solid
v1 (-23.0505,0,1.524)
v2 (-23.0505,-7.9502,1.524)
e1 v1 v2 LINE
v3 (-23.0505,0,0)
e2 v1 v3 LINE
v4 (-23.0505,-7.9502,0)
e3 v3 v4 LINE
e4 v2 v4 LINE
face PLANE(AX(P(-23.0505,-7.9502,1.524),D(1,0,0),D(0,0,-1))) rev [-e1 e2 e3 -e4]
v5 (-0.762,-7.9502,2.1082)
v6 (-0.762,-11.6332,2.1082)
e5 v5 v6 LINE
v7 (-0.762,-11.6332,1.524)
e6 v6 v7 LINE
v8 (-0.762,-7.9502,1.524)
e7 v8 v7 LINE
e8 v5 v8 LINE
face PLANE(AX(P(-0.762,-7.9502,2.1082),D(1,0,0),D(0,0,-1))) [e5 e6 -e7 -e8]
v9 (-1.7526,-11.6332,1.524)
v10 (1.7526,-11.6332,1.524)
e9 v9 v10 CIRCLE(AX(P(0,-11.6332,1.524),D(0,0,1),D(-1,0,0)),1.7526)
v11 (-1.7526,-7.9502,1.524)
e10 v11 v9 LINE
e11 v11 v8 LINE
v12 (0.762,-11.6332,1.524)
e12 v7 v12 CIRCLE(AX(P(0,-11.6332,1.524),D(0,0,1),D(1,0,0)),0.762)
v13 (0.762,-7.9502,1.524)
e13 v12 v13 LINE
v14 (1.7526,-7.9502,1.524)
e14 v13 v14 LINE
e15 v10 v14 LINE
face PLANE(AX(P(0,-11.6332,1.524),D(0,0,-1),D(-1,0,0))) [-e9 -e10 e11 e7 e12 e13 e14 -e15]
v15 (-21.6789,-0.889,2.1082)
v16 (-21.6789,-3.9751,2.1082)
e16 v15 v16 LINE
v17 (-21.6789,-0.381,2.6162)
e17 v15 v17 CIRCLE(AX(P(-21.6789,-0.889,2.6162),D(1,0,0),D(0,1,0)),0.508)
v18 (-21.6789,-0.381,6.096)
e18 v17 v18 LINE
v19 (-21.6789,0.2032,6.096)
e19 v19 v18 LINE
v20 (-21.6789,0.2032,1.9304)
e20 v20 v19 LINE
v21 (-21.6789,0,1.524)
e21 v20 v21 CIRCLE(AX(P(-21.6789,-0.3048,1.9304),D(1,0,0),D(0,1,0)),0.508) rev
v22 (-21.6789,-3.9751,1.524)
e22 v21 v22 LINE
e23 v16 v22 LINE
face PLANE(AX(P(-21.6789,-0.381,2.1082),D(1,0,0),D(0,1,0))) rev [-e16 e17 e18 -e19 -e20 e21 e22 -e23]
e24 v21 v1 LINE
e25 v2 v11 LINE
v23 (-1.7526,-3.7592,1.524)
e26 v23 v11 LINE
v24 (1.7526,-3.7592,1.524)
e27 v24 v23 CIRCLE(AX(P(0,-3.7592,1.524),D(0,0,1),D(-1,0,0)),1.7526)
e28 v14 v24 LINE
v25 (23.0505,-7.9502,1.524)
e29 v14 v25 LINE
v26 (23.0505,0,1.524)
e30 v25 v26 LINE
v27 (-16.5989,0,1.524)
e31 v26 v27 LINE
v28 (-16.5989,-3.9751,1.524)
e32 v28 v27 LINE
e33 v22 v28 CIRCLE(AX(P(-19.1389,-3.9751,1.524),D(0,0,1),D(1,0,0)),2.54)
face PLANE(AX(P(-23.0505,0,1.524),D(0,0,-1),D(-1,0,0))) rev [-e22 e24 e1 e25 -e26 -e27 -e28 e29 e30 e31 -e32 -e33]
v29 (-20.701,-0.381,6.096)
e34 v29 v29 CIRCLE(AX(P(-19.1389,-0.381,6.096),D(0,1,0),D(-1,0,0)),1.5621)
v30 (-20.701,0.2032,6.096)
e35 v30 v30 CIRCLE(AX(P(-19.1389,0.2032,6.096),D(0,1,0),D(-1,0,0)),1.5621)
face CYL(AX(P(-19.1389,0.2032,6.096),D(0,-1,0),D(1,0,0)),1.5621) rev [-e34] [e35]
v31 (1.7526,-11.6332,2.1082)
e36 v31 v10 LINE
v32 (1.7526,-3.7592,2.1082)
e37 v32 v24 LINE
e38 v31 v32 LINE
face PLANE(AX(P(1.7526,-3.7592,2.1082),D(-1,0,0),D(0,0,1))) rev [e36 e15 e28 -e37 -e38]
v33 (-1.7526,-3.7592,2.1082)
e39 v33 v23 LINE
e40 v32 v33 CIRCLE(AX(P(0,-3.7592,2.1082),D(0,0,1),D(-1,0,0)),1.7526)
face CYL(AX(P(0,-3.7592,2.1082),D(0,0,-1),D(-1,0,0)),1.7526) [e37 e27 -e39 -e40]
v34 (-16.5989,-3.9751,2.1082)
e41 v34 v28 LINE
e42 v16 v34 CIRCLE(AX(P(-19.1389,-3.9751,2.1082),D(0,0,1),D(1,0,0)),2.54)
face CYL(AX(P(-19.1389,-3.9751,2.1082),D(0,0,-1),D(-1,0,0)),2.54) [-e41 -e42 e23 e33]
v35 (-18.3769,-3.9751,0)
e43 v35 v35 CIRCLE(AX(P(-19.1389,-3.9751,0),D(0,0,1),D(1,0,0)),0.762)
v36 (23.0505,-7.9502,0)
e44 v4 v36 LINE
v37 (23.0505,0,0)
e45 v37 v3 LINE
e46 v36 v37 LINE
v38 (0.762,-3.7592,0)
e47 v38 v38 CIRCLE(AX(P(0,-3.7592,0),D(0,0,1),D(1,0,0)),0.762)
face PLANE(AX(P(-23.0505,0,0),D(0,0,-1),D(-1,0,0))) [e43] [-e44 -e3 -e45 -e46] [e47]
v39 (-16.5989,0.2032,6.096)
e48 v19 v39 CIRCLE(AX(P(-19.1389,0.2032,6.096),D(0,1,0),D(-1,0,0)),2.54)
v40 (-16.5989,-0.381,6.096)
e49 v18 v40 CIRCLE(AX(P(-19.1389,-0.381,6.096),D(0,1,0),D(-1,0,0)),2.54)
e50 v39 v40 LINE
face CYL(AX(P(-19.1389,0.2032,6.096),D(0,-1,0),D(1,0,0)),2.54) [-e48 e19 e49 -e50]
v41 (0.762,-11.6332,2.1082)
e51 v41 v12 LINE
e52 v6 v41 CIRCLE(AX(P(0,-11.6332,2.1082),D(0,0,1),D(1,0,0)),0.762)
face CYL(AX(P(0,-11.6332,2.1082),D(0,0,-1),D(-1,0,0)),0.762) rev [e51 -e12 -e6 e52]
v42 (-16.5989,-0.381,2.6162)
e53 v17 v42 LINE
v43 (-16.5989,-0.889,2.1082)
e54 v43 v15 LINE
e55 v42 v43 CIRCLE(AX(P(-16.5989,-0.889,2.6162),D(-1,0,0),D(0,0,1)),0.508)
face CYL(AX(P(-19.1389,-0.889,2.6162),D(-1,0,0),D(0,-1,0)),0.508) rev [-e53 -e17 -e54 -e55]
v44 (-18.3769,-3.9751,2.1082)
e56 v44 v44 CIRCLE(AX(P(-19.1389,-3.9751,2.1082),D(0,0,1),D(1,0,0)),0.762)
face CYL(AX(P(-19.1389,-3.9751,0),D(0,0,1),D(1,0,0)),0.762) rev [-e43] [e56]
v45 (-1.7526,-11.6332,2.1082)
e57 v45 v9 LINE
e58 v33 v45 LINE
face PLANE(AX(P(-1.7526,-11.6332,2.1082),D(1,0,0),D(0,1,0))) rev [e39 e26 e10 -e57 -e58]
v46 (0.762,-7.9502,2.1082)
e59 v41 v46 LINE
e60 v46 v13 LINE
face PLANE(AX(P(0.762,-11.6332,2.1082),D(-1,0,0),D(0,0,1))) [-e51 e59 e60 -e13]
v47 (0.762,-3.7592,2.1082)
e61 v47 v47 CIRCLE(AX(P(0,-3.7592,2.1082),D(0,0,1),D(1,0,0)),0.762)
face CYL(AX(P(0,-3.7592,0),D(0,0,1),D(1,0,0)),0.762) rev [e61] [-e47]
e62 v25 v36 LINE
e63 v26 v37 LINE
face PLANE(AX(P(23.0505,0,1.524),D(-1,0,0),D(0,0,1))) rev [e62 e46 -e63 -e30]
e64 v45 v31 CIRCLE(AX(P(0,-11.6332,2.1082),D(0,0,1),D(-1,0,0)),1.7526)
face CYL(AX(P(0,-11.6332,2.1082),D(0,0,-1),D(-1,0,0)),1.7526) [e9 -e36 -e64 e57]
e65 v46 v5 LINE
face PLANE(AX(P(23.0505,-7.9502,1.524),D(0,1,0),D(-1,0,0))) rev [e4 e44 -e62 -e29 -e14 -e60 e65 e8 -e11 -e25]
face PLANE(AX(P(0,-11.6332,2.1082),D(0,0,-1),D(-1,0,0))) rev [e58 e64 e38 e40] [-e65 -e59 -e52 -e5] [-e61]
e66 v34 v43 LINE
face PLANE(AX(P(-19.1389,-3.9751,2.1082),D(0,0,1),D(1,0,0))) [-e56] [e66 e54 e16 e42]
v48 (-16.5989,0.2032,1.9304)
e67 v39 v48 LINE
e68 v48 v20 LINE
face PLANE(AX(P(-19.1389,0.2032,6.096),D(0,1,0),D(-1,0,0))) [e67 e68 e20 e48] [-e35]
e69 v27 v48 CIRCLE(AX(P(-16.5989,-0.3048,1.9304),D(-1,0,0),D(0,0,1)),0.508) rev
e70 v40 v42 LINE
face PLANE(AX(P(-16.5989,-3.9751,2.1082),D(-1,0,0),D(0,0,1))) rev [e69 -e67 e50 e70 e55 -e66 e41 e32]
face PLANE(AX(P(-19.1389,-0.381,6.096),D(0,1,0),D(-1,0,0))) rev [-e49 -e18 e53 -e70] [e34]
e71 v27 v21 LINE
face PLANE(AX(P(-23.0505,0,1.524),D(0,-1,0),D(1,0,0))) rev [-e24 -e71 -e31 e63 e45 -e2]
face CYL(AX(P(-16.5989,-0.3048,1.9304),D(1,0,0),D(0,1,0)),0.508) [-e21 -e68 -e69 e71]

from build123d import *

# Parameters (mm, degrees)
SKETCH_1_W          = 46.101
SKETCH_1_H          = 7.9502
EXTRUDE_1_DEPTH     = 1.524
EXTRUDE_2_DEPTH     = 0.5842
SKETCH_3_R          = 1.5621
EXTRUDE_3_DEPTH     = 0.5842
FILLET_1_R          = 0.508
SKETCH_4_R          = 0.762
CUT_EXTRUDE_4_DEPTH = 26.241699688
EXTRUDE_5_DEPTH     = 0.5842
SKETCH_6_R          = 0.762
CUT_EXTRUDE_6_DEPTH = 28.442983889


with BuildPart() as part:
    # 草圖1 → 伸長1 (new body)
    with BuildSketch(Plane.XY):
        with Locations((0, -3.9751)):
            Rectangle(SKETCH_1_W, SKETCH_1_H)
    extrude(amount=EXTRUDE_1_DEPTH)

    # 草圖2 → 伸長2 (add)
    with BuildSketch(Plane.XY.offset(1.524)):
        with BuildLine():
            Line((-21.6789, -0.381), (-21.6789, -3.9751))
            ThreePointArc((-21.6789, -3.9751), (-19.1389, -6.5151), (-16.5989, -3.9751))
            Line((-16.5989, -3.9751), (-16.5989, -0.381))
            Line((-16.5989, -0.381), (-21.6789, -0.381))
        make_face()
    extrude(amount=EXTRUDE_2_DEPTH)

    # 草圖3 → 伸長3 (add)
    with BuildSketch(Plane(origin=(0, -0.381, 0), x_dir=(1, 0, 0), z_dir=(0, 1, 0))):
        with BuildLine():
            Line((-16.5989, -1.524), (-21.6789, -1.524))
            Line((-21.6789, -1.524), (-21.6789, -6.096))
            ThreePointArc((-21.6789, -6.096), (-19.1389, -8.636), (-16.5989, -6.096))
            Line((-16.5989, -6.096), (-16.5989, -1.524))
        make_face()
        with Locations(Location((-19.1389, -6.096, 0), (0, 0, 180))):
            Circle(SKETCH_3_R, mode=Mode.SUBTRACT)
    extrude(amount=EXTRUDE_3_DEPTH)

    # 圓角1
    # the kernel refuses this fillet: 0.508 mm, written as the material it adds along each edge
    with BuildSketch(Plane(origin=(-16.5989, -0.381, 2.1082), x_dir=(0, 0, 1), z_dir=(-1, 0, 0))) as fillet_1_piece_1:
        with BuildLine():
            CenterArc((FILLET_1_R, -FILLET_1_R), FILLET_1_R, 90, 90)
            Line((0, -FILLET_1_R), (0, 0))
            Line((0, 0), (FILLET_1_R, 0))
        make_face()
    extrude(amount=5.08)
    # the kernel refuses this fillet: 0.508 mm, written as the material it takes off along each edge
    with BuildSketch(Plane(origin=(-15.5829, 0.2032, 1.524), x_dir=(0, -1.0, 2.6096797513364413e-11), z_dir=(-1, 0, 0))) as fillet_1_2_piece_1:
        with BuildLine():
            CenterArc((0.508, 0.4064), FILLET_1_R, 179.999999999, 53.130102355)
            Line((0, 0.4064), (0, 0))
            Line((0, 0), (0.2032, 0))
        make_face()
    extrude(amount=7.112, mode=Mode.SUBTRACT)

    # 草圖4 → 伸長4 (cut, through all)
    with BuildSketch(Plane.XY.offset(2.1082)):
        with Locations((-19.1389, -3.9751)):
            Circle(SKETCH_4_R)
    extrude(amount=-CUT_EXTRUDE_4_DEPTH, mode=Mode.SUBTRACT)

    # 草圖5 → 伸長5 (add)
    with BuildSketch(Plane.XY.offset(1.524)):
        with BuildLine():
            Line((-1.7526, -11.6332), (-1.7526, -3.7592))
            ThreePointArc((-1.7526, -3.7592), (0, -2.0066), (1.7526, -3.7592))
            Line((1.7526, -3.7592), (1.7526, -11.6332))
            ThreePointArc((1.7526, -11.6332), (0, -13.3858), (-1.7526, -11.6332))
        make_face()
        with BuildLine():
            Line((-0.762, -7.9502), (-0.762, -11.6332))
            ThreePointArc((-0.762, -11.6332), (0, -12.3952), (0.762, -11.6332))
            Line((0.762, -11.6332), (0.762, -7.9502))
            Line((0.762, -7.9502), (-0.762, -7.9502))
        make_face(mode=Mode.SUBTRACT)
    extrude(amount=EXTRUDE_5_DEPTH)

    # 草圖6 → 伸長6 (cut, through all)
    with BuildSketch(Plane.XY.offset(2.1082)):
        with Locations((0, -3.7592)):
            Circle(SKETCH_6_R)
    extrude(amount=-CUT_EXTRUDE_6_DEPTH, mode=Mode.SUBTRACT)


solid = part.part
